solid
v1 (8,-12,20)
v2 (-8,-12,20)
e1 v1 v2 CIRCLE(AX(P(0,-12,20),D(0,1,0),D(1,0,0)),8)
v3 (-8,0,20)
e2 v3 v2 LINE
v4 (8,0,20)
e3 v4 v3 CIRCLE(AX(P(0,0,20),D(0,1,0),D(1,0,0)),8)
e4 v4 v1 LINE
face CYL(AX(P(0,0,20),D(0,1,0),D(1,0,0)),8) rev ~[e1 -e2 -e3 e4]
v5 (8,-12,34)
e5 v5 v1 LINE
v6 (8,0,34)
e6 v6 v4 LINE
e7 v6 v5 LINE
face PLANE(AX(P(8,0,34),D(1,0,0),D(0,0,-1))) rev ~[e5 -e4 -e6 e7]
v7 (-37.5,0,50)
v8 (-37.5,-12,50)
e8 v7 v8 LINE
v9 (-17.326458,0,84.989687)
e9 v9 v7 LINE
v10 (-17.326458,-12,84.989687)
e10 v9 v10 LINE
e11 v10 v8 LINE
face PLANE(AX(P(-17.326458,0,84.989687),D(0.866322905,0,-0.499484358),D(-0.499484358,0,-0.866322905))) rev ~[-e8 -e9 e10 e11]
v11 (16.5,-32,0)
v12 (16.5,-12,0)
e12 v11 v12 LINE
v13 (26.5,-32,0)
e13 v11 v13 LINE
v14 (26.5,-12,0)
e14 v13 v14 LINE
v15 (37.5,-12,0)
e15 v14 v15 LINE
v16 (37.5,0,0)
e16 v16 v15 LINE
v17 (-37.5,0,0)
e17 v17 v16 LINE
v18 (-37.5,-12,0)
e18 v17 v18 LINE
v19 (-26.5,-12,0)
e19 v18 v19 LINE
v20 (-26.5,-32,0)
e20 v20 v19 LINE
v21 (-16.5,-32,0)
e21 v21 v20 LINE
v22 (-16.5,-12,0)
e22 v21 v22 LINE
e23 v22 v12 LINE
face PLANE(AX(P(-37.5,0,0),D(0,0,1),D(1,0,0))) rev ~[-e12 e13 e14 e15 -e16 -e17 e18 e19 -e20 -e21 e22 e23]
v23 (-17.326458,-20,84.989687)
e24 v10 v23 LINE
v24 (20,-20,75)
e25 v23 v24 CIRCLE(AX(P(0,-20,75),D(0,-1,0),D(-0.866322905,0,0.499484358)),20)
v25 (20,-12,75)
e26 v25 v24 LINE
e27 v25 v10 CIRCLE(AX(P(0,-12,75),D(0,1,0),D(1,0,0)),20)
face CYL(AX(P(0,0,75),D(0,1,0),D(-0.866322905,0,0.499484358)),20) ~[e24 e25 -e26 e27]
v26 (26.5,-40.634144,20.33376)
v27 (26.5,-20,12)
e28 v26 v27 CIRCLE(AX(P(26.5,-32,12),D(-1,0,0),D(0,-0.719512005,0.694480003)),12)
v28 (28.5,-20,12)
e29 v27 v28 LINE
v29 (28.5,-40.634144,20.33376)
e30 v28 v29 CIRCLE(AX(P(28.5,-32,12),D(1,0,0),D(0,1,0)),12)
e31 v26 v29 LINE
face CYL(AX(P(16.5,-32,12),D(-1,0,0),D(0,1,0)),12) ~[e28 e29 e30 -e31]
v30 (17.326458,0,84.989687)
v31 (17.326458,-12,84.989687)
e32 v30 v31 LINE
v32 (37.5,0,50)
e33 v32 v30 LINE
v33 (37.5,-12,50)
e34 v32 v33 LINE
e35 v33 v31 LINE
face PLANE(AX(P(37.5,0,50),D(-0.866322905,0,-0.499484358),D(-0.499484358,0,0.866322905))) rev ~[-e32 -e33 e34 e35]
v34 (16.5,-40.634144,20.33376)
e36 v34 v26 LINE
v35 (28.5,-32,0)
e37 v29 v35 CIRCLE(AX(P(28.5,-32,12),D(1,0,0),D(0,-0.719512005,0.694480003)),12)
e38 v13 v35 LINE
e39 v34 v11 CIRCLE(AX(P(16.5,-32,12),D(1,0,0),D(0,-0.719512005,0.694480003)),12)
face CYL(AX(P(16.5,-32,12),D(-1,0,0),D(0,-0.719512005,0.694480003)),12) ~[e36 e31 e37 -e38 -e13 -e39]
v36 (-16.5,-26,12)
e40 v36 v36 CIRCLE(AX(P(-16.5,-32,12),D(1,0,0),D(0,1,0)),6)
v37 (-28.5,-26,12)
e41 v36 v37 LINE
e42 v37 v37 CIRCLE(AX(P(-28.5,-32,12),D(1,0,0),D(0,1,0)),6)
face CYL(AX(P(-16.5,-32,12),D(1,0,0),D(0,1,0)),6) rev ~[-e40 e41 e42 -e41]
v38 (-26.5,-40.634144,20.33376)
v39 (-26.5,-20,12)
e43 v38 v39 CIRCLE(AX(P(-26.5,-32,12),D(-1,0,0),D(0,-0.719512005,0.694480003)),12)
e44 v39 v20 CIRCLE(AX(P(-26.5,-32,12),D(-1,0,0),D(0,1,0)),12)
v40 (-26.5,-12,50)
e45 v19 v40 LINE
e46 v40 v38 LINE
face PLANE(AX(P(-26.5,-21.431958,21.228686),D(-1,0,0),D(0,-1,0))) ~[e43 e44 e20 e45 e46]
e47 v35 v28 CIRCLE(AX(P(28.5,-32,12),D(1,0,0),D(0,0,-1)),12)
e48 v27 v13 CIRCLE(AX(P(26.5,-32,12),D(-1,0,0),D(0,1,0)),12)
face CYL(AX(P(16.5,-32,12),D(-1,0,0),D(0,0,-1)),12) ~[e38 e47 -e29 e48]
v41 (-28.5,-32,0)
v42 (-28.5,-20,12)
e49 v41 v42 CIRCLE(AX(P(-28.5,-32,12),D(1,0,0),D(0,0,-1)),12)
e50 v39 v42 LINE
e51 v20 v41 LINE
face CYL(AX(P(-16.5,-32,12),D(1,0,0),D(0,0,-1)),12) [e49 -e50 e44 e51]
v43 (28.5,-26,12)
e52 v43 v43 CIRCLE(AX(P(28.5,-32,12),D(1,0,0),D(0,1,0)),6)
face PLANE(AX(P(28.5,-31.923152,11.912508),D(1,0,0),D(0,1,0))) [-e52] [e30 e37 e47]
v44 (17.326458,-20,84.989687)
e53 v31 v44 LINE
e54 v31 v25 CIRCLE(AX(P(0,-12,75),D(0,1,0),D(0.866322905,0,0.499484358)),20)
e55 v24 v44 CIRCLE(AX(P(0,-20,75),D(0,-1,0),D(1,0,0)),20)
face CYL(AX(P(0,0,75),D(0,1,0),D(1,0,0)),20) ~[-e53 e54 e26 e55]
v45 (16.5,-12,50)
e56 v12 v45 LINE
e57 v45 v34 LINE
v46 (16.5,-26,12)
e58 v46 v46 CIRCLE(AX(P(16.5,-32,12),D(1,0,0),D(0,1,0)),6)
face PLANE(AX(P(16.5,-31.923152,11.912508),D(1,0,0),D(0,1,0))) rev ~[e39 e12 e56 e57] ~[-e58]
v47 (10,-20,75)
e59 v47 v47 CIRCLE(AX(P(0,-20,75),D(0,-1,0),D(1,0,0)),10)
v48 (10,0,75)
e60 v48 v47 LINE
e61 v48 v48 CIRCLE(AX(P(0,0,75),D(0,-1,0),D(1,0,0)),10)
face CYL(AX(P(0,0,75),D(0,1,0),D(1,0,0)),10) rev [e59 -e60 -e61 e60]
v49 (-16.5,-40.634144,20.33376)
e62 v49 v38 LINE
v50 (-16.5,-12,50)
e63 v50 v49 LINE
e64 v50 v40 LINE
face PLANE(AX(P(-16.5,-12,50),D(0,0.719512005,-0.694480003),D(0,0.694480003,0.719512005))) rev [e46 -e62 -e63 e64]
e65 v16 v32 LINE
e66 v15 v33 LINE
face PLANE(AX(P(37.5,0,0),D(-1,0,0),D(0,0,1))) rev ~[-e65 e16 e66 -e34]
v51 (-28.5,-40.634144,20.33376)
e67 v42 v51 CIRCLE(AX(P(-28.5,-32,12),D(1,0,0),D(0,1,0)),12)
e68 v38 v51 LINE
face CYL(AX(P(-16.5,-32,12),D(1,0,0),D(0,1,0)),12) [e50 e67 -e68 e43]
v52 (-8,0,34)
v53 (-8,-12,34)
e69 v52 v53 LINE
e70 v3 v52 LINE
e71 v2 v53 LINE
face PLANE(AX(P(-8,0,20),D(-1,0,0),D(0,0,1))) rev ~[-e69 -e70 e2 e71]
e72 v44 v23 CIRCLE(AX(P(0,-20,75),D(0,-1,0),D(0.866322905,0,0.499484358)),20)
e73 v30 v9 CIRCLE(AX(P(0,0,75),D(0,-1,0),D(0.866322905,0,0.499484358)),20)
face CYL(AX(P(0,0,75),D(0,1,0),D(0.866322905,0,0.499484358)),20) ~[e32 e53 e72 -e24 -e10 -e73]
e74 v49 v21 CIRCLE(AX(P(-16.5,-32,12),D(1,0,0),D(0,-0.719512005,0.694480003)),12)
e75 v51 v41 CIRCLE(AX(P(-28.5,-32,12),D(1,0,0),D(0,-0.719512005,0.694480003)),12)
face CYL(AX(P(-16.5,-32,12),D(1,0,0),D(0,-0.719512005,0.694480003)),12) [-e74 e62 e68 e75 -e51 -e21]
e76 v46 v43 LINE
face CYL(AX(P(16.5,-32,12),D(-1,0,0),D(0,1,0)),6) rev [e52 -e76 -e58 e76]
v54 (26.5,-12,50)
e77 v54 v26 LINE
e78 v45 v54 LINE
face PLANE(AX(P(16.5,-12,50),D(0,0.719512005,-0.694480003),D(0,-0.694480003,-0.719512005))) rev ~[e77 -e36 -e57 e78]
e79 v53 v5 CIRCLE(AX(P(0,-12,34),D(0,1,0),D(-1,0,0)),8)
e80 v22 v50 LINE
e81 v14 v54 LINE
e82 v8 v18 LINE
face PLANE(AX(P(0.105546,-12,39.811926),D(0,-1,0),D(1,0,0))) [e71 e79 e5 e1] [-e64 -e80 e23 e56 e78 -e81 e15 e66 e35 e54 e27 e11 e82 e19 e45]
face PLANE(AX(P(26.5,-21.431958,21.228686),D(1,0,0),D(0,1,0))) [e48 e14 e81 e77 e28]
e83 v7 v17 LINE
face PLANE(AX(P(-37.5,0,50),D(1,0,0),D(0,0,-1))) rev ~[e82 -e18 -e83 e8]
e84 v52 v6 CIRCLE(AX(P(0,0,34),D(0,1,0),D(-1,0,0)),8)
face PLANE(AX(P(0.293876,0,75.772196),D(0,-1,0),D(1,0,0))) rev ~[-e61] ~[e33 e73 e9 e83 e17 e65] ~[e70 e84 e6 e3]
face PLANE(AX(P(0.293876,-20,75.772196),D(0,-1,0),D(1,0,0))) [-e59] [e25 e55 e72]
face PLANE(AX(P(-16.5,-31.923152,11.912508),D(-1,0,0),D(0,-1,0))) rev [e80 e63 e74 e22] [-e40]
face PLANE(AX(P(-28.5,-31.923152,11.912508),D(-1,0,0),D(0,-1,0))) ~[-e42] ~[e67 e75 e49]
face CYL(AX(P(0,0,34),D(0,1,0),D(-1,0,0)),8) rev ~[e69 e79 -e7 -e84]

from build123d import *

# Parameters (mm, degrees)
F1_DEPTH = 12
F0_R     = 10
F2_DEPTH = 20
F5_DEPTH = 10
F4_R     = 6
F6_DEPTH = 12


# Not quite as in the source:
# - a pattern or mirror of a feature is missing from the dataset's text; its kind, count and spacing are read off the source's solid


with BuildPart() as f1:
    # F0 (on Front) → F1 (new body)
    with BuildSketch(Plane.XZ):
        with BuildLine():
            ThreePointArc((17.3264581055, 84.9896871582), (19.3200564454, 80.1706304205), (20, 75))
            ThreePointArc((20, 75), (-5.1706304205, 55.6799435546), (-17.3264581055, 84.9896871582))
            Line((-17.3264581055, 84.9896871582), (-37.5, 50))
            Line((-37.5, 50), (-37.5, 0))
            Line((-37.5, 0), (37.5, 0))
            Line((37.5, 0), (37.5, 50))
            Line((37.5, 50), (17.3264581055, 84.9896871582))
        make_face()
        with BuildLine():
            ThreePointArc((8, 20), (0, 12), (-8, 20))
            Line((-8, 20), (-8, 34))
            ThreePointArc((-8, 34), (0, 42), (8, 34))
            Line((8, 34), (8, 20))
        make_face(mode=Mode.SUBTRACT)
    extrude(amount=F1_DEPTH)

    # F0 (on Front) → F2 (join)
    with BuildSketch(Plane.XZ):
        with BuildLine():
            ThreePointArc((-17.3264581055, 84.9896871582), (-5.1706304205, 55.6799435546), (20, 75))
            ThreePointArc((20, 75), (19.3200564454, 80.1706304205), (17.3264581055, 84.9896871582))
            ThreePointArc((17.3264581055, 84.9896871582), (0, 95), (-17.3264581055, 84.9896871582))
        make_face()
        with Locations((0, 75)):
            Circle(F0_R, mode=Mode.SUBTRACT)
    extrude(amount=F2_DEPTH)

    # F4 (on offset) → F5 (join)
    with BuildSketch(Plane.YZ.offset(16.5)):
        with BuildLine():
            ThreePointArc((-40.6341440633, 20.3337600333), (-27.5061001769, 23.1267634279), (-20, 12))
            ThreePointArc((-20, 12), (-23.5147186258, 3.5147186258), (-32, 0))
            Line((-32, 0), (-12, 0))
            Line((-12, 0), (-12, 50))
            Line((-12, 50), (-40.6341440633, 20.3337600333))
        make_face()
    f5 = extrude(amount=F5_DEPTH)

    # F5_copies: F5 across plane
    add(f5.mirror(Plane(origin=(0, 0, 0), x_dir=(0, 0, -1), z_dir=(-1, 0, 0))))

    # F4 (on offset) → F6 (join)
    with BuildSketch(Plane.YZ.offset(16.5)):
        with BuildLine():
            ThreePointArc((-32, 0), (-23.5147186258, 3.5147186258), (-20, 12))
            ThreePointArc((-20, 12), (-27.5061001769, 23.1267634279), (-40.6341440633, 20.3337600333))
            ThreePointArc((-40.6341440633, 20.3337600333), (-43.0454769114, 7.3098571664), (-32, 0))
        make_face()
        with Locations((-32, 12)):
            Circle(F4_R, mode=Mode.SUBTRACT)
    f6 = extrude(amount=F6_DEPTH)

    # F6_copies: F6 across plane
    add(f6.mirror(Plane(origin=(0, 0, 0), x_dir=(0, 0, -1), z_dir=(-1, 0, 0))))


solid = f1.part
